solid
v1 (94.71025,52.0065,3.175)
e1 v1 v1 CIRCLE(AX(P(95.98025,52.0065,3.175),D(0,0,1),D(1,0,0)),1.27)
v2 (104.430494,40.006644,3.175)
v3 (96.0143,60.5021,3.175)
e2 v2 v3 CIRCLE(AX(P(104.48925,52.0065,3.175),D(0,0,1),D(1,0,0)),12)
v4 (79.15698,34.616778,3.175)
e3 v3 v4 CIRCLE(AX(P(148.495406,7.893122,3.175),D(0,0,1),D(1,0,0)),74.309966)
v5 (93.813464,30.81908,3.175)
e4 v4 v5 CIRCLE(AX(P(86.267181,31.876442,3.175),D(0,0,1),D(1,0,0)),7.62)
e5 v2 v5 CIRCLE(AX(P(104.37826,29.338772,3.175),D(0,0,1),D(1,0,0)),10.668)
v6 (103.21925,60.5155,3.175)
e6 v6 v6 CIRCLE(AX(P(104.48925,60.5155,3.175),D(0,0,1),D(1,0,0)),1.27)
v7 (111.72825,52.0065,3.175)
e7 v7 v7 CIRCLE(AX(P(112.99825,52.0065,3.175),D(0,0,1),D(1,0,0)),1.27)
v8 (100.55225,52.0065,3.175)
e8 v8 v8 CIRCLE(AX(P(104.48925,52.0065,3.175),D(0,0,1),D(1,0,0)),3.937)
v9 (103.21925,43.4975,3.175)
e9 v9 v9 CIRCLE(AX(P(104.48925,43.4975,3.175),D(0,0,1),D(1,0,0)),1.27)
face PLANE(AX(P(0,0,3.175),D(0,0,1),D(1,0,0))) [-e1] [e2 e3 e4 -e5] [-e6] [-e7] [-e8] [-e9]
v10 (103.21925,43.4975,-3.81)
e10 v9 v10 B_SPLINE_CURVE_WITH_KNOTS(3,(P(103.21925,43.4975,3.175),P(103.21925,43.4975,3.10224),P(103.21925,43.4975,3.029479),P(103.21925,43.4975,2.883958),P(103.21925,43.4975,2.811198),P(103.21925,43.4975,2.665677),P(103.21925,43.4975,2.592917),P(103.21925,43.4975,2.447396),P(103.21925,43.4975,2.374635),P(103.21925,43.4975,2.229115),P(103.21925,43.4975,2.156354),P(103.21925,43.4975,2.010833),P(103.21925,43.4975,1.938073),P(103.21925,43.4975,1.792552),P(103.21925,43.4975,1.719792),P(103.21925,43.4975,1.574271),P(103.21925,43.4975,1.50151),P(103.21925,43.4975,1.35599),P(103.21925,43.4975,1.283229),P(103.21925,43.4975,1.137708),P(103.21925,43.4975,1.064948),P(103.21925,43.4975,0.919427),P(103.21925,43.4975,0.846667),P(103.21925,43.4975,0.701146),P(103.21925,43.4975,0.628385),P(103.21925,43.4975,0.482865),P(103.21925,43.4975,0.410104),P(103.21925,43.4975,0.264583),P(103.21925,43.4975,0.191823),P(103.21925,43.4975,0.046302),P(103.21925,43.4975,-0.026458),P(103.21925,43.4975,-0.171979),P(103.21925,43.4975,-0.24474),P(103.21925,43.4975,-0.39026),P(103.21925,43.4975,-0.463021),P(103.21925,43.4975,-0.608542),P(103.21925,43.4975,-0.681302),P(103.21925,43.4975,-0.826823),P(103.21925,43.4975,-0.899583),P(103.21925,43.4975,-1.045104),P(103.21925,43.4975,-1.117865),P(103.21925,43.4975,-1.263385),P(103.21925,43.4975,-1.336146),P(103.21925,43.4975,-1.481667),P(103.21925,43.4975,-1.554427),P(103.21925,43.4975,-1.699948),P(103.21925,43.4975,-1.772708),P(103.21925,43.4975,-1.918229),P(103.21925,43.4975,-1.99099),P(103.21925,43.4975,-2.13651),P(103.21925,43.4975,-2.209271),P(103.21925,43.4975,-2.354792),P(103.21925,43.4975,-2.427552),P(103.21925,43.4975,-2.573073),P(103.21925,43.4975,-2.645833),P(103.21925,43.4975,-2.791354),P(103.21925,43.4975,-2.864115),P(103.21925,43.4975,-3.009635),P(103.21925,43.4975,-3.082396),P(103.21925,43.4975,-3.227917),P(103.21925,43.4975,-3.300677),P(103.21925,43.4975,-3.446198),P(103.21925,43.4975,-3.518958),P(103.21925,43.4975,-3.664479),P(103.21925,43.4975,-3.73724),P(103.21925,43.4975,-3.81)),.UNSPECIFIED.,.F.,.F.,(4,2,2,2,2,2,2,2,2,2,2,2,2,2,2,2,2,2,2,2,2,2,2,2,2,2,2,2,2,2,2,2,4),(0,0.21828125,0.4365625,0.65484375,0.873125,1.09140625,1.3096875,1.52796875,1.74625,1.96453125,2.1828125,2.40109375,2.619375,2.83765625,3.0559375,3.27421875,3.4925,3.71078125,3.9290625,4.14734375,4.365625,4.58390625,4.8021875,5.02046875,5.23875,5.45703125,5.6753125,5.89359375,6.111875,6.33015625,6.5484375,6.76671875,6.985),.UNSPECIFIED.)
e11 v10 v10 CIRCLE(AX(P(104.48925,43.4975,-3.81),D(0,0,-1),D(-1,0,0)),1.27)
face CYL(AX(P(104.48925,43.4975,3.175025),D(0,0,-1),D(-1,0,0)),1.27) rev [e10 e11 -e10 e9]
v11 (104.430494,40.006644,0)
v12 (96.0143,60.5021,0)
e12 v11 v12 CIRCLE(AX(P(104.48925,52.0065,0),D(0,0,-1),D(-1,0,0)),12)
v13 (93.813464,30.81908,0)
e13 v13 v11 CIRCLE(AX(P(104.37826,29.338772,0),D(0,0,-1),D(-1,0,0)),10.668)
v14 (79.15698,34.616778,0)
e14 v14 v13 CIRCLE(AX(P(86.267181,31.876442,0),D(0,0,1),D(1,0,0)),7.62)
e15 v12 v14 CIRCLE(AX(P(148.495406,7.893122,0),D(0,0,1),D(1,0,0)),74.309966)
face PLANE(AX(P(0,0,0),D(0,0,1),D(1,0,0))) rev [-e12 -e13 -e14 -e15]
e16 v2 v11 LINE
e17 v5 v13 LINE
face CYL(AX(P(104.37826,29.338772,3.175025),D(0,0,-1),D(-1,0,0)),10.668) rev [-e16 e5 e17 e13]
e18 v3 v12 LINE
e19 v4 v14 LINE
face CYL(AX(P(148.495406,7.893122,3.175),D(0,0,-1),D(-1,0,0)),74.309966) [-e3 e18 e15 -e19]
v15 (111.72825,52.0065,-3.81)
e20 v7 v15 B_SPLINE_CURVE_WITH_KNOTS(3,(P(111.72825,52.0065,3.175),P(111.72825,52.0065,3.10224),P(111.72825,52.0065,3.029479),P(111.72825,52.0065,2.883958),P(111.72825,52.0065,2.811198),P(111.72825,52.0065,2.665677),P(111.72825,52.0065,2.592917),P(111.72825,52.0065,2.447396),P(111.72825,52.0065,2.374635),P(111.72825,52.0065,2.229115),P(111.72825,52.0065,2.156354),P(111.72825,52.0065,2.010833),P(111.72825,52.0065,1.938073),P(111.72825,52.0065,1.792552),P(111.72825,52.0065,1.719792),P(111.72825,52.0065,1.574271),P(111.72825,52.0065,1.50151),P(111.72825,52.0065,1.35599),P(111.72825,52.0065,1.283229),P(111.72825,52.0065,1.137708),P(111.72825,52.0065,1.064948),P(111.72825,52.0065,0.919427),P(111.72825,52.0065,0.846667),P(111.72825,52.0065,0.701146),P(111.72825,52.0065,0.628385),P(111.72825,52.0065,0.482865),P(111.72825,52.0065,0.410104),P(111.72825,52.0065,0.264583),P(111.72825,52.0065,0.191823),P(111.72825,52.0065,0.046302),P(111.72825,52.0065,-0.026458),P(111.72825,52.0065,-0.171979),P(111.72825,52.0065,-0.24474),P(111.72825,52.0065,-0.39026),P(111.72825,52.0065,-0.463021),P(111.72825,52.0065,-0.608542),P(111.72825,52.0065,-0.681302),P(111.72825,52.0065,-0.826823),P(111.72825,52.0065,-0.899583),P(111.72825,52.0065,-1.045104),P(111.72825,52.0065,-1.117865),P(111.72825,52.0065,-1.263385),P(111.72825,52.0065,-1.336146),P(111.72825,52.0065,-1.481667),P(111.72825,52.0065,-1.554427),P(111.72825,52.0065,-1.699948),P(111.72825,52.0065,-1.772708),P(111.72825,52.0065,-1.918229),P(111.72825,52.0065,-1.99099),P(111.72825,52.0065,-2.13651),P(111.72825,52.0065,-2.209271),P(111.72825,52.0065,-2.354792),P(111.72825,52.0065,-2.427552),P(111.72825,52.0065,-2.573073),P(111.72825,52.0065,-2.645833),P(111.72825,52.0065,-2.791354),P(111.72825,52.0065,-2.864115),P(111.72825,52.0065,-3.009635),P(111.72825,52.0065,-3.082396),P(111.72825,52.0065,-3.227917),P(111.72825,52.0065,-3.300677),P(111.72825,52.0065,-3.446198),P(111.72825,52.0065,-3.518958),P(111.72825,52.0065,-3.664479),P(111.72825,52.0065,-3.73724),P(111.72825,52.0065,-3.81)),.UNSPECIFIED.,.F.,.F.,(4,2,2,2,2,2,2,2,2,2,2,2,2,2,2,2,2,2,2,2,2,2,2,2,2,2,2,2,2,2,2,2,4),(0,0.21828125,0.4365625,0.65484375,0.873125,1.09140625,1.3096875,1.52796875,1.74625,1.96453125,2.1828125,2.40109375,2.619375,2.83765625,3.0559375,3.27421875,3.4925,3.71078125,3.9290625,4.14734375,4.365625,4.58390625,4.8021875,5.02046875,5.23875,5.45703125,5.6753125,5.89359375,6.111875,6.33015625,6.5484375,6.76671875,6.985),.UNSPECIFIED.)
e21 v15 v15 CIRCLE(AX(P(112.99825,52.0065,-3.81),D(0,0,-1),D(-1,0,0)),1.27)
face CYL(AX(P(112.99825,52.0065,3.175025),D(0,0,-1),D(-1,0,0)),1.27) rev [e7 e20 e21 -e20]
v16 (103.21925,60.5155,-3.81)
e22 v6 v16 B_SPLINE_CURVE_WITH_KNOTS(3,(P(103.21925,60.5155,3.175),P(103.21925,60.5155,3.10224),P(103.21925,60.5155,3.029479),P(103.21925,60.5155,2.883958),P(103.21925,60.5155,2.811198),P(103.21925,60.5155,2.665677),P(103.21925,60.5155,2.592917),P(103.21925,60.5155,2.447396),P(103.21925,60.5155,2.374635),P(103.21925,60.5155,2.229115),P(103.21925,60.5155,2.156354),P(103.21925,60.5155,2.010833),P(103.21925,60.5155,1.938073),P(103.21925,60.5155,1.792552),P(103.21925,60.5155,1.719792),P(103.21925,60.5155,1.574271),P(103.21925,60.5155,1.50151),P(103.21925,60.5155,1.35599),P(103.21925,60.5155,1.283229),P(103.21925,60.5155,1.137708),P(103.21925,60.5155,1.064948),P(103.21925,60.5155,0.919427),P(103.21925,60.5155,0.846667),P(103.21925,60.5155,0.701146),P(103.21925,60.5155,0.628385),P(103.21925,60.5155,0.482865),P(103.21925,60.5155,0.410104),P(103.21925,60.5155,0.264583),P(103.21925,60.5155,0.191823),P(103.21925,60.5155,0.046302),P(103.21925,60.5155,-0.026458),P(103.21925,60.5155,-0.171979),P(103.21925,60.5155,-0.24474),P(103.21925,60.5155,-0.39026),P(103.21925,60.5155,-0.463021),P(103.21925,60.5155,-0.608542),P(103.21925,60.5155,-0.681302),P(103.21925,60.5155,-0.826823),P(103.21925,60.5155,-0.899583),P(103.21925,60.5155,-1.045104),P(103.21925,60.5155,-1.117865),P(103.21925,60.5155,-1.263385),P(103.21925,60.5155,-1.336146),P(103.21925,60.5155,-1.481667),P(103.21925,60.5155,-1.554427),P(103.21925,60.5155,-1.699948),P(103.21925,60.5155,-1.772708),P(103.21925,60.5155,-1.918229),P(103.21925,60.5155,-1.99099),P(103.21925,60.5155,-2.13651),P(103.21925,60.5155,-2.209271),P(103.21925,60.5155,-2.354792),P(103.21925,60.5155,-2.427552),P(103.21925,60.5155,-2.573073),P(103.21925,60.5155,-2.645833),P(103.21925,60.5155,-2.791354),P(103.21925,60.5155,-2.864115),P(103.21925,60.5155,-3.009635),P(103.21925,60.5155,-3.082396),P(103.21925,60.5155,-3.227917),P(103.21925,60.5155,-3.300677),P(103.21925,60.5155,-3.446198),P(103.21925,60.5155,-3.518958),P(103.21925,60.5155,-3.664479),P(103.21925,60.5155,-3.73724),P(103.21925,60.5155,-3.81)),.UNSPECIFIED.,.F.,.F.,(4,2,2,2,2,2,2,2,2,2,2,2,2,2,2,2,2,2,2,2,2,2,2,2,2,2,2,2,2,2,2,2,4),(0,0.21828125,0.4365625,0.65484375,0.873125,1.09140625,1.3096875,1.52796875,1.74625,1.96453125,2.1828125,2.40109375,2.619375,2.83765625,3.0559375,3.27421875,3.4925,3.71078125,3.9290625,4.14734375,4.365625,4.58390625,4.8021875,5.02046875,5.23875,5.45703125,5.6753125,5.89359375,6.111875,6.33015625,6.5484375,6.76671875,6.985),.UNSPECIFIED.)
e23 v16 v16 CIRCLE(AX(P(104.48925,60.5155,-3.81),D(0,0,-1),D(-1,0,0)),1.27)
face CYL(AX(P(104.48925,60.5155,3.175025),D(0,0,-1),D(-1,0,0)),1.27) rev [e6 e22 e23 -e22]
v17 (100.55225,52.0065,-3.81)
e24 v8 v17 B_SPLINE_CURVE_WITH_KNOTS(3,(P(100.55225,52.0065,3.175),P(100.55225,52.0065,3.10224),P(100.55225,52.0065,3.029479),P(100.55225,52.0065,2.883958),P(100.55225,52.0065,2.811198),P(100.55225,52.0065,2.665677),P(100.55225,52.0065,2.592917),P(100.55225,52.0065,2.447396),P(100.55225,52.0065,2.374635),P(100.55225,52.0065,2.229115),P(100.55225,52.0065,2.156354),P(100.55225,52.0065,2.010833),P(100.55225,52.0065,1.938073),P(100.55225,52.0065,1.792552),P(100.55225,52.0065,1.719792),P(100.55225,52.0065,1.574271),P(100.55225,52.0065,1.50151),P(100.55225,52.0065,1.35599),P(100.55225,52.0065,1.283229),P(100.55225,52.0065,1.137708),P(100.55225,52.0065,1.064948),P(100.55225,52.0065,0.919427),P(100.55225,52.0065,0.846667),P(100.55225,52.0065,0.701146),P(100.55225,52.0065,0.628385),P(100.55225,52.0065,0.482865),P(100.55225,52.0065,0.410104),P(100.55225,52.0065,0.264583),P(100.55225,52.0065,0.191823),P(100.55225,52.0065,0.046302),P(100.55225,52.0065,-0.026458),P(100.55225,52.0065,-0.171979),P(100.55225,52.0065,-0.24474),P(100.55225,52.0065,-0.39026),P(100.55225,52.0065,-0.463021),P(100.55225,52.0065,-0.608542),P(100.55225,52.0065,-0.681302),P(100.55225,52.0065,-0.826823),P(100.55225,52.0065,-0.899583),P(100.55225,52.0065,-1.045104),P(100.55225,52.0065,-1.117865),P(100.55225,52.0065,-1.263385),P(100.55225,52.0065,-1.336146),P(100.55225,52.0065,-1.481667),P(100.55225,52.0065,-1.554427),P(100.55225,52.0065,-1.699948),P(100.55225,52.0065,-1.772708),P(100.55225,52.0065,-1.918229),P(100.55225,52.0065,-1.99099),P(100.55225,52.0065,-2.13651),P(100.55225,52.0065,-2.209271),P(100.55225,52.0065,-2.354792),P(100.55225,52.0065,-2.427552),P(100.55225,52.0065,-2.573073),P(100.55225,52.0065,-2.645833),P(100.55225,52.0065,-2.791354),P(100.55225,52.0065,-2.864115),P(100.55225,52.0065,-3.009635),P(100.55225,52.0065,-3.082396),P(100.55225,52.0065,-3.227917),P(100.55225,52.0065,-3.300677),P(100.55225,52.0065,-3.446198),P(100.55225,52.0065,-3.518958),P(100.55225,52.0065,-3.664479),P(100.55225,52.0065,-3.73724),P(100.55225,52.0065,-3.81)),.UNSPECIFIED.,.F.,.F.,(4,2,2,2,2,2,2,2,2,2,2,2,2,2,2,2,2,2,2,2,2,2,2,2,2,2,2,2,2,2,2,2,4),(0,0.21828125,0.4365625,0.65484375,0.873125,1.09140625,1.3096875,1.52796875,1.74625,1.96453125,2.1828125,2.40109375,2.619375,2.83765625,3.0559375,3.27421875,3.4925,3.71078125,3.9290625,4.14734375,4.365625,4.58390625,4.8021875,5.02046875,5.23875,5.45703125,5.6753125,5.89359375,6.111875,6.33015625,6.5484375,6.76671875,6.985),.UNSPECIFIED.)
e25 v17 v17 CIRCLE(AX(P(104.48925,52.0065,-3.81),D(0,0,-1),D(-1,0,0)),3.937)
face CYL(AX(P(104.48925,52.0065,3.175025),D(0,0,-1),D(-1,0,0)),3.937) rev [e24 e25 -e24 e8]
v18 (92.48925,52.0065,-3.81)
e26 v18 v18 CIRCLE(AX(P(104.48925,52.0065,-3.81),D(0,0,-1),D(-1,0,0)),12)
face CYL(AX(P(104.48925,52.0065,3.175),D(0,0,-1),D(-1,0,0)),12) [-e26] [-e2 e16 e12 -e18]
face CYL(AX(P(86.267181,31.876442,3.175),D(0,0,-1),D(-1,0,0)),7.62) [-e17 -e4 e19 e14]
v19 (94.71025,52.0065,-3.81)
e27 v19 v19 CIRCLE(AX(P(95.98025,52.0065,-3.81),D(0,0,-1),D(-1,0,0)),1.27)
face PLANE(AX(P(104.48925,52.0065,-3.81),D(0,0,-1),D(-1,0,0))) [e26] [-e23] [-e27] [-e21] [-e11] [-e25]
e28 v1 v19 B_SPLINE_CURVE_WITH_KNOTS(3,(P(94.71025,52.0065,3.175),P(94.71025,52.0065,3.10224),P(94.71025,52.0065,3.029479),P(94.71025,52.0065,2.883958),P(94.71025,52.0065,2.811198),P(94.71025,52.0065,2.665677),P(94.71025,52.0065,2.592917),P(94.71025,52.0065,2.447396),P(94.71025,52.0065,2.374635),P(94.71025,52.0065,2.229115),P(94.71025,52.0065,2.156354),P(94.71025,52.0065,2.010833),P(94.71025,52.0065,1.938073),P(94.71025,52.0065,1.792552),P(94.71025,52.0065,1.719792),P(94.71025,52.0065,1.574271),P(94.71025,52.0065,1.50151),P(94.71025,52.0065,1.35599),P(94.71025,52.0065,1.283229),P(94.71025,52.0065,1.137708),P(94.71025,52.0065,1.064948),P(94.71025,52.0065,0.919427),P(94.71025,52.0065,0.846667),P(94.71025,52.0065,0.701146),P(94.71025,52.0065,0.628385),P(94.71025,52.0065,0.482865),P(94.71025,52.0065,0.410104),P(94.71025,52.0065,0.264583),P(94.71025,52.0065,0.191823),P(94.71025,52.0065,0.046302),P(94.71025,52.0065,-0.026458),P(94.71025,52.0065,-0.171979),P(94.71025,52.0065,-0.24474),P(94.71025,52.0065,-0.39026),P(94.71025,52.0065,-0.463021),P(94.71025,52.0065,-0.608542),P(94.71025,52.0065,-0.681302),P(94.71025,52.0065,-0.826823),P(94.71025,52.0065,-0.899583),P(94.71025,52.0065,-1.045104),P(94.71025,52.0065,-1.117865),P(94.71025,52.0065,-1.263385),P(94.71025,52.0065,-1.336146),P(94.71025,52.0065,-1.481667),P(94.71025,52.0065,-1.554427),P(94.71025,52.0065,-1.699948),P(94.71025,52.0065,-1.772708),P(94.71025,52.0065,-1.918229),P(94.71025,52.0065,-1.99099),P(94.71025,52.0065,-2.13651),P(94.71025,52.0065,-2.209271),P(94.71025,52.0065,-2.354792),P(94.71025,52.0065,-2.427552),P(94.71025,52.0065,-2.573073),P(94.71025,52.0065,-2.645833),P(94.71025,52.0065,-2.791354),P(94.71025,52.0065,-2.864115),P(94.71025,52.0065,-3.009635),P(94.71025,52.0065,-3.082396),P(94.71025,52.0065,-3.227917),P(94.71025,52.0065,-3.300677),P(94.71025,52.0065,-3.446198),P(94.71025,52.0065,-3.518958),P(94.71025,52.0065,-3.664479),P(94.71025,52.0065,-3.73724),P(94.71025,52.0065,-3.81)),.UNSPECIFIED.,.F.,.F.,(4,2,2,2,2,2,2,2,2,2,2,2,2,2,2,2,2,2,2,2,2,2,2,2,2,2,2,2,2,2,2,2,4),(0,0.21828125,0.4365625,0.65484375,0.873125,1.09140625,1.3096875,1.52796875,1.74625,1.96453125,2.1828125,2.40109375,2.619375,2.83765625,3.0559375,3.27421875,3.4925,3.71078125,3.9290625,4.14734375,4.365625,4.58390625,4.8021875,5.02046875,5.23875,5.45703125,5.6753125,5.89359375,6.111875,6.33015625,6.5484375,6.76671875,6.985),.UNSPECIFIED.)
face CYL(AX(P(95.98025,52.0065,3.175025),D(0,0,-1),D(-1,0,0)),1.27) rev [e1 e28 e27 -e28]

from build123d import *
from build123d.topology import SkipClean

# Parameters (mm, degrees)
BOSS_EXTRUDE1_DEPTH = 3.175
BOSS_EXTRUDE2_START = 3.81
SKETCH2_R           = 12
BOSS_EXTRUDE2_DEPTH = 3.81
SKETCH3_R           = 3.937
CUT_EXTRUDE1_DEPTH  = 134.099089527
SKETCH4_R           = 1.27
CUT_EXTRUDE2_DEPTH  = 134.099089527
CUT_EXTRUDE3_DEPTH  = 133.970273023


with BuildPart() as part:
    # Sketch1 → Boss-Extrude1 (new body)
    with BuildSketch(Plane.XY):
        with BuildLine():
            ThreePointArc((113.784062988, 44.416608597), (112.542436022, 60.902914722), (96.014300162, 60.502100346))
            ThreePointArc((96.014300162, 60.502100346), (86.225733854, 48.445051897), (79.156979953, 34.616777747))
            ThreePointArc((79.156979953, 34.616777747), (81.153408489, 26.227218543), (89.699693339, 25.073335615))
            ThreePointArc((89.699693339, 25.073335615), (102.758092485, 33.479680479), (113.784062988, 44.416608597))
        make_face()
    extrude(amount=BOSS_EXTRUDE1_DEPTH)

    # Sketch2 → Boss-Extrude2 (add)
    with SkipClean():  # the faces are left unmerged after this step: merging them gives an invalid solid
        with BuildSketch(Plane(origin=(0, 0, 0), x_dir=(-1, 0, 0), z_dir=(0, 0, -1)).offset(BOSS_EXTRUDE2_START)):
            with Locations((-104.48925, 52.0065)):
                Circle(SKETCH2_R)
        extrude(amount=-BOSS_EXTRUDE2_DEPTH)

    # Sketch3 → Cut-Extrude1 (cut, through all)
    with SkipClean():  # the faces are left unmerged after this step: merging them gives an invalid solid
        with BuildSketch(Plane(origin=(0, 0, -3.81), x_dir=(-1, 0, 0), z_dir=(0, 0, -1))):
            with Locations((-104.48925, 52.0065)):
                Circle(SKETCH3_R)
        extrude(amount=-CUT_EXTRUDE1_DEPTH, mode=Mode.SUBTRACT)

    # Sketch4 → Cut-Extrude2 (cut, through all)
    with SkipClean():  # the faces are left unmerged after this step: merging them gives an invalid solid
        with BuildSketch(Plane(origin=(0, 0, -3.81), x_dir=(-1, 0, 0), z_dir=(0, 0, -1))):
            with Locations((-95.98025, 52.0065)):
                Circle(SKETCH4_R)
            with Locations((-112.99825, 52.0065)):
                Circle(SKETCH4_R)
            with Locations((-104.48925, 43.4975)):
                Circle(SKETCH4_R)
            with Locations((-104.48925, 60.5155)):
                Circle(SKETCH4_R)
        extrude(amount=-CUT_EXTRUDE2_DEPTH, mode=Mode.SUBTRACT)

    # Sketch5 → Cut-Extrude3 (cut, through all)
    with SkipClean():  # the faces are left unmerged after this step: merging them gives an invalid solid
        with BuildSketch(Plane(origin=(0, 0, 0), x_dir=(-1, 0, 0), z_dir=(0, 0, -1))):
            with BuildLine():
                ThreePointArc((-104.430493989, 40.006643845), (-109.606684651, 41.15238269), (-113.7840634, 44.4166091))
                ThreePointArc((-113.7840634, 44.4166091), (-102.758092767, 33.479680706), (-89.699693406, 25.073335649))
                ThreePointArc((-89.699693406, 25.073335649), (-92.462895691, 27.440507008), (-93.81346398, 30.819079549))
                ThreePointArc((-93.81346398, 30.819079549), (-97.397477458, 37.40567327), (-104.430493989, 40.006643845))
            make_face()
        extrude(amount=-CUT_EXTRUDE3_DEPTH, mode=Mode.SUBTRACT)


solid = part.part
